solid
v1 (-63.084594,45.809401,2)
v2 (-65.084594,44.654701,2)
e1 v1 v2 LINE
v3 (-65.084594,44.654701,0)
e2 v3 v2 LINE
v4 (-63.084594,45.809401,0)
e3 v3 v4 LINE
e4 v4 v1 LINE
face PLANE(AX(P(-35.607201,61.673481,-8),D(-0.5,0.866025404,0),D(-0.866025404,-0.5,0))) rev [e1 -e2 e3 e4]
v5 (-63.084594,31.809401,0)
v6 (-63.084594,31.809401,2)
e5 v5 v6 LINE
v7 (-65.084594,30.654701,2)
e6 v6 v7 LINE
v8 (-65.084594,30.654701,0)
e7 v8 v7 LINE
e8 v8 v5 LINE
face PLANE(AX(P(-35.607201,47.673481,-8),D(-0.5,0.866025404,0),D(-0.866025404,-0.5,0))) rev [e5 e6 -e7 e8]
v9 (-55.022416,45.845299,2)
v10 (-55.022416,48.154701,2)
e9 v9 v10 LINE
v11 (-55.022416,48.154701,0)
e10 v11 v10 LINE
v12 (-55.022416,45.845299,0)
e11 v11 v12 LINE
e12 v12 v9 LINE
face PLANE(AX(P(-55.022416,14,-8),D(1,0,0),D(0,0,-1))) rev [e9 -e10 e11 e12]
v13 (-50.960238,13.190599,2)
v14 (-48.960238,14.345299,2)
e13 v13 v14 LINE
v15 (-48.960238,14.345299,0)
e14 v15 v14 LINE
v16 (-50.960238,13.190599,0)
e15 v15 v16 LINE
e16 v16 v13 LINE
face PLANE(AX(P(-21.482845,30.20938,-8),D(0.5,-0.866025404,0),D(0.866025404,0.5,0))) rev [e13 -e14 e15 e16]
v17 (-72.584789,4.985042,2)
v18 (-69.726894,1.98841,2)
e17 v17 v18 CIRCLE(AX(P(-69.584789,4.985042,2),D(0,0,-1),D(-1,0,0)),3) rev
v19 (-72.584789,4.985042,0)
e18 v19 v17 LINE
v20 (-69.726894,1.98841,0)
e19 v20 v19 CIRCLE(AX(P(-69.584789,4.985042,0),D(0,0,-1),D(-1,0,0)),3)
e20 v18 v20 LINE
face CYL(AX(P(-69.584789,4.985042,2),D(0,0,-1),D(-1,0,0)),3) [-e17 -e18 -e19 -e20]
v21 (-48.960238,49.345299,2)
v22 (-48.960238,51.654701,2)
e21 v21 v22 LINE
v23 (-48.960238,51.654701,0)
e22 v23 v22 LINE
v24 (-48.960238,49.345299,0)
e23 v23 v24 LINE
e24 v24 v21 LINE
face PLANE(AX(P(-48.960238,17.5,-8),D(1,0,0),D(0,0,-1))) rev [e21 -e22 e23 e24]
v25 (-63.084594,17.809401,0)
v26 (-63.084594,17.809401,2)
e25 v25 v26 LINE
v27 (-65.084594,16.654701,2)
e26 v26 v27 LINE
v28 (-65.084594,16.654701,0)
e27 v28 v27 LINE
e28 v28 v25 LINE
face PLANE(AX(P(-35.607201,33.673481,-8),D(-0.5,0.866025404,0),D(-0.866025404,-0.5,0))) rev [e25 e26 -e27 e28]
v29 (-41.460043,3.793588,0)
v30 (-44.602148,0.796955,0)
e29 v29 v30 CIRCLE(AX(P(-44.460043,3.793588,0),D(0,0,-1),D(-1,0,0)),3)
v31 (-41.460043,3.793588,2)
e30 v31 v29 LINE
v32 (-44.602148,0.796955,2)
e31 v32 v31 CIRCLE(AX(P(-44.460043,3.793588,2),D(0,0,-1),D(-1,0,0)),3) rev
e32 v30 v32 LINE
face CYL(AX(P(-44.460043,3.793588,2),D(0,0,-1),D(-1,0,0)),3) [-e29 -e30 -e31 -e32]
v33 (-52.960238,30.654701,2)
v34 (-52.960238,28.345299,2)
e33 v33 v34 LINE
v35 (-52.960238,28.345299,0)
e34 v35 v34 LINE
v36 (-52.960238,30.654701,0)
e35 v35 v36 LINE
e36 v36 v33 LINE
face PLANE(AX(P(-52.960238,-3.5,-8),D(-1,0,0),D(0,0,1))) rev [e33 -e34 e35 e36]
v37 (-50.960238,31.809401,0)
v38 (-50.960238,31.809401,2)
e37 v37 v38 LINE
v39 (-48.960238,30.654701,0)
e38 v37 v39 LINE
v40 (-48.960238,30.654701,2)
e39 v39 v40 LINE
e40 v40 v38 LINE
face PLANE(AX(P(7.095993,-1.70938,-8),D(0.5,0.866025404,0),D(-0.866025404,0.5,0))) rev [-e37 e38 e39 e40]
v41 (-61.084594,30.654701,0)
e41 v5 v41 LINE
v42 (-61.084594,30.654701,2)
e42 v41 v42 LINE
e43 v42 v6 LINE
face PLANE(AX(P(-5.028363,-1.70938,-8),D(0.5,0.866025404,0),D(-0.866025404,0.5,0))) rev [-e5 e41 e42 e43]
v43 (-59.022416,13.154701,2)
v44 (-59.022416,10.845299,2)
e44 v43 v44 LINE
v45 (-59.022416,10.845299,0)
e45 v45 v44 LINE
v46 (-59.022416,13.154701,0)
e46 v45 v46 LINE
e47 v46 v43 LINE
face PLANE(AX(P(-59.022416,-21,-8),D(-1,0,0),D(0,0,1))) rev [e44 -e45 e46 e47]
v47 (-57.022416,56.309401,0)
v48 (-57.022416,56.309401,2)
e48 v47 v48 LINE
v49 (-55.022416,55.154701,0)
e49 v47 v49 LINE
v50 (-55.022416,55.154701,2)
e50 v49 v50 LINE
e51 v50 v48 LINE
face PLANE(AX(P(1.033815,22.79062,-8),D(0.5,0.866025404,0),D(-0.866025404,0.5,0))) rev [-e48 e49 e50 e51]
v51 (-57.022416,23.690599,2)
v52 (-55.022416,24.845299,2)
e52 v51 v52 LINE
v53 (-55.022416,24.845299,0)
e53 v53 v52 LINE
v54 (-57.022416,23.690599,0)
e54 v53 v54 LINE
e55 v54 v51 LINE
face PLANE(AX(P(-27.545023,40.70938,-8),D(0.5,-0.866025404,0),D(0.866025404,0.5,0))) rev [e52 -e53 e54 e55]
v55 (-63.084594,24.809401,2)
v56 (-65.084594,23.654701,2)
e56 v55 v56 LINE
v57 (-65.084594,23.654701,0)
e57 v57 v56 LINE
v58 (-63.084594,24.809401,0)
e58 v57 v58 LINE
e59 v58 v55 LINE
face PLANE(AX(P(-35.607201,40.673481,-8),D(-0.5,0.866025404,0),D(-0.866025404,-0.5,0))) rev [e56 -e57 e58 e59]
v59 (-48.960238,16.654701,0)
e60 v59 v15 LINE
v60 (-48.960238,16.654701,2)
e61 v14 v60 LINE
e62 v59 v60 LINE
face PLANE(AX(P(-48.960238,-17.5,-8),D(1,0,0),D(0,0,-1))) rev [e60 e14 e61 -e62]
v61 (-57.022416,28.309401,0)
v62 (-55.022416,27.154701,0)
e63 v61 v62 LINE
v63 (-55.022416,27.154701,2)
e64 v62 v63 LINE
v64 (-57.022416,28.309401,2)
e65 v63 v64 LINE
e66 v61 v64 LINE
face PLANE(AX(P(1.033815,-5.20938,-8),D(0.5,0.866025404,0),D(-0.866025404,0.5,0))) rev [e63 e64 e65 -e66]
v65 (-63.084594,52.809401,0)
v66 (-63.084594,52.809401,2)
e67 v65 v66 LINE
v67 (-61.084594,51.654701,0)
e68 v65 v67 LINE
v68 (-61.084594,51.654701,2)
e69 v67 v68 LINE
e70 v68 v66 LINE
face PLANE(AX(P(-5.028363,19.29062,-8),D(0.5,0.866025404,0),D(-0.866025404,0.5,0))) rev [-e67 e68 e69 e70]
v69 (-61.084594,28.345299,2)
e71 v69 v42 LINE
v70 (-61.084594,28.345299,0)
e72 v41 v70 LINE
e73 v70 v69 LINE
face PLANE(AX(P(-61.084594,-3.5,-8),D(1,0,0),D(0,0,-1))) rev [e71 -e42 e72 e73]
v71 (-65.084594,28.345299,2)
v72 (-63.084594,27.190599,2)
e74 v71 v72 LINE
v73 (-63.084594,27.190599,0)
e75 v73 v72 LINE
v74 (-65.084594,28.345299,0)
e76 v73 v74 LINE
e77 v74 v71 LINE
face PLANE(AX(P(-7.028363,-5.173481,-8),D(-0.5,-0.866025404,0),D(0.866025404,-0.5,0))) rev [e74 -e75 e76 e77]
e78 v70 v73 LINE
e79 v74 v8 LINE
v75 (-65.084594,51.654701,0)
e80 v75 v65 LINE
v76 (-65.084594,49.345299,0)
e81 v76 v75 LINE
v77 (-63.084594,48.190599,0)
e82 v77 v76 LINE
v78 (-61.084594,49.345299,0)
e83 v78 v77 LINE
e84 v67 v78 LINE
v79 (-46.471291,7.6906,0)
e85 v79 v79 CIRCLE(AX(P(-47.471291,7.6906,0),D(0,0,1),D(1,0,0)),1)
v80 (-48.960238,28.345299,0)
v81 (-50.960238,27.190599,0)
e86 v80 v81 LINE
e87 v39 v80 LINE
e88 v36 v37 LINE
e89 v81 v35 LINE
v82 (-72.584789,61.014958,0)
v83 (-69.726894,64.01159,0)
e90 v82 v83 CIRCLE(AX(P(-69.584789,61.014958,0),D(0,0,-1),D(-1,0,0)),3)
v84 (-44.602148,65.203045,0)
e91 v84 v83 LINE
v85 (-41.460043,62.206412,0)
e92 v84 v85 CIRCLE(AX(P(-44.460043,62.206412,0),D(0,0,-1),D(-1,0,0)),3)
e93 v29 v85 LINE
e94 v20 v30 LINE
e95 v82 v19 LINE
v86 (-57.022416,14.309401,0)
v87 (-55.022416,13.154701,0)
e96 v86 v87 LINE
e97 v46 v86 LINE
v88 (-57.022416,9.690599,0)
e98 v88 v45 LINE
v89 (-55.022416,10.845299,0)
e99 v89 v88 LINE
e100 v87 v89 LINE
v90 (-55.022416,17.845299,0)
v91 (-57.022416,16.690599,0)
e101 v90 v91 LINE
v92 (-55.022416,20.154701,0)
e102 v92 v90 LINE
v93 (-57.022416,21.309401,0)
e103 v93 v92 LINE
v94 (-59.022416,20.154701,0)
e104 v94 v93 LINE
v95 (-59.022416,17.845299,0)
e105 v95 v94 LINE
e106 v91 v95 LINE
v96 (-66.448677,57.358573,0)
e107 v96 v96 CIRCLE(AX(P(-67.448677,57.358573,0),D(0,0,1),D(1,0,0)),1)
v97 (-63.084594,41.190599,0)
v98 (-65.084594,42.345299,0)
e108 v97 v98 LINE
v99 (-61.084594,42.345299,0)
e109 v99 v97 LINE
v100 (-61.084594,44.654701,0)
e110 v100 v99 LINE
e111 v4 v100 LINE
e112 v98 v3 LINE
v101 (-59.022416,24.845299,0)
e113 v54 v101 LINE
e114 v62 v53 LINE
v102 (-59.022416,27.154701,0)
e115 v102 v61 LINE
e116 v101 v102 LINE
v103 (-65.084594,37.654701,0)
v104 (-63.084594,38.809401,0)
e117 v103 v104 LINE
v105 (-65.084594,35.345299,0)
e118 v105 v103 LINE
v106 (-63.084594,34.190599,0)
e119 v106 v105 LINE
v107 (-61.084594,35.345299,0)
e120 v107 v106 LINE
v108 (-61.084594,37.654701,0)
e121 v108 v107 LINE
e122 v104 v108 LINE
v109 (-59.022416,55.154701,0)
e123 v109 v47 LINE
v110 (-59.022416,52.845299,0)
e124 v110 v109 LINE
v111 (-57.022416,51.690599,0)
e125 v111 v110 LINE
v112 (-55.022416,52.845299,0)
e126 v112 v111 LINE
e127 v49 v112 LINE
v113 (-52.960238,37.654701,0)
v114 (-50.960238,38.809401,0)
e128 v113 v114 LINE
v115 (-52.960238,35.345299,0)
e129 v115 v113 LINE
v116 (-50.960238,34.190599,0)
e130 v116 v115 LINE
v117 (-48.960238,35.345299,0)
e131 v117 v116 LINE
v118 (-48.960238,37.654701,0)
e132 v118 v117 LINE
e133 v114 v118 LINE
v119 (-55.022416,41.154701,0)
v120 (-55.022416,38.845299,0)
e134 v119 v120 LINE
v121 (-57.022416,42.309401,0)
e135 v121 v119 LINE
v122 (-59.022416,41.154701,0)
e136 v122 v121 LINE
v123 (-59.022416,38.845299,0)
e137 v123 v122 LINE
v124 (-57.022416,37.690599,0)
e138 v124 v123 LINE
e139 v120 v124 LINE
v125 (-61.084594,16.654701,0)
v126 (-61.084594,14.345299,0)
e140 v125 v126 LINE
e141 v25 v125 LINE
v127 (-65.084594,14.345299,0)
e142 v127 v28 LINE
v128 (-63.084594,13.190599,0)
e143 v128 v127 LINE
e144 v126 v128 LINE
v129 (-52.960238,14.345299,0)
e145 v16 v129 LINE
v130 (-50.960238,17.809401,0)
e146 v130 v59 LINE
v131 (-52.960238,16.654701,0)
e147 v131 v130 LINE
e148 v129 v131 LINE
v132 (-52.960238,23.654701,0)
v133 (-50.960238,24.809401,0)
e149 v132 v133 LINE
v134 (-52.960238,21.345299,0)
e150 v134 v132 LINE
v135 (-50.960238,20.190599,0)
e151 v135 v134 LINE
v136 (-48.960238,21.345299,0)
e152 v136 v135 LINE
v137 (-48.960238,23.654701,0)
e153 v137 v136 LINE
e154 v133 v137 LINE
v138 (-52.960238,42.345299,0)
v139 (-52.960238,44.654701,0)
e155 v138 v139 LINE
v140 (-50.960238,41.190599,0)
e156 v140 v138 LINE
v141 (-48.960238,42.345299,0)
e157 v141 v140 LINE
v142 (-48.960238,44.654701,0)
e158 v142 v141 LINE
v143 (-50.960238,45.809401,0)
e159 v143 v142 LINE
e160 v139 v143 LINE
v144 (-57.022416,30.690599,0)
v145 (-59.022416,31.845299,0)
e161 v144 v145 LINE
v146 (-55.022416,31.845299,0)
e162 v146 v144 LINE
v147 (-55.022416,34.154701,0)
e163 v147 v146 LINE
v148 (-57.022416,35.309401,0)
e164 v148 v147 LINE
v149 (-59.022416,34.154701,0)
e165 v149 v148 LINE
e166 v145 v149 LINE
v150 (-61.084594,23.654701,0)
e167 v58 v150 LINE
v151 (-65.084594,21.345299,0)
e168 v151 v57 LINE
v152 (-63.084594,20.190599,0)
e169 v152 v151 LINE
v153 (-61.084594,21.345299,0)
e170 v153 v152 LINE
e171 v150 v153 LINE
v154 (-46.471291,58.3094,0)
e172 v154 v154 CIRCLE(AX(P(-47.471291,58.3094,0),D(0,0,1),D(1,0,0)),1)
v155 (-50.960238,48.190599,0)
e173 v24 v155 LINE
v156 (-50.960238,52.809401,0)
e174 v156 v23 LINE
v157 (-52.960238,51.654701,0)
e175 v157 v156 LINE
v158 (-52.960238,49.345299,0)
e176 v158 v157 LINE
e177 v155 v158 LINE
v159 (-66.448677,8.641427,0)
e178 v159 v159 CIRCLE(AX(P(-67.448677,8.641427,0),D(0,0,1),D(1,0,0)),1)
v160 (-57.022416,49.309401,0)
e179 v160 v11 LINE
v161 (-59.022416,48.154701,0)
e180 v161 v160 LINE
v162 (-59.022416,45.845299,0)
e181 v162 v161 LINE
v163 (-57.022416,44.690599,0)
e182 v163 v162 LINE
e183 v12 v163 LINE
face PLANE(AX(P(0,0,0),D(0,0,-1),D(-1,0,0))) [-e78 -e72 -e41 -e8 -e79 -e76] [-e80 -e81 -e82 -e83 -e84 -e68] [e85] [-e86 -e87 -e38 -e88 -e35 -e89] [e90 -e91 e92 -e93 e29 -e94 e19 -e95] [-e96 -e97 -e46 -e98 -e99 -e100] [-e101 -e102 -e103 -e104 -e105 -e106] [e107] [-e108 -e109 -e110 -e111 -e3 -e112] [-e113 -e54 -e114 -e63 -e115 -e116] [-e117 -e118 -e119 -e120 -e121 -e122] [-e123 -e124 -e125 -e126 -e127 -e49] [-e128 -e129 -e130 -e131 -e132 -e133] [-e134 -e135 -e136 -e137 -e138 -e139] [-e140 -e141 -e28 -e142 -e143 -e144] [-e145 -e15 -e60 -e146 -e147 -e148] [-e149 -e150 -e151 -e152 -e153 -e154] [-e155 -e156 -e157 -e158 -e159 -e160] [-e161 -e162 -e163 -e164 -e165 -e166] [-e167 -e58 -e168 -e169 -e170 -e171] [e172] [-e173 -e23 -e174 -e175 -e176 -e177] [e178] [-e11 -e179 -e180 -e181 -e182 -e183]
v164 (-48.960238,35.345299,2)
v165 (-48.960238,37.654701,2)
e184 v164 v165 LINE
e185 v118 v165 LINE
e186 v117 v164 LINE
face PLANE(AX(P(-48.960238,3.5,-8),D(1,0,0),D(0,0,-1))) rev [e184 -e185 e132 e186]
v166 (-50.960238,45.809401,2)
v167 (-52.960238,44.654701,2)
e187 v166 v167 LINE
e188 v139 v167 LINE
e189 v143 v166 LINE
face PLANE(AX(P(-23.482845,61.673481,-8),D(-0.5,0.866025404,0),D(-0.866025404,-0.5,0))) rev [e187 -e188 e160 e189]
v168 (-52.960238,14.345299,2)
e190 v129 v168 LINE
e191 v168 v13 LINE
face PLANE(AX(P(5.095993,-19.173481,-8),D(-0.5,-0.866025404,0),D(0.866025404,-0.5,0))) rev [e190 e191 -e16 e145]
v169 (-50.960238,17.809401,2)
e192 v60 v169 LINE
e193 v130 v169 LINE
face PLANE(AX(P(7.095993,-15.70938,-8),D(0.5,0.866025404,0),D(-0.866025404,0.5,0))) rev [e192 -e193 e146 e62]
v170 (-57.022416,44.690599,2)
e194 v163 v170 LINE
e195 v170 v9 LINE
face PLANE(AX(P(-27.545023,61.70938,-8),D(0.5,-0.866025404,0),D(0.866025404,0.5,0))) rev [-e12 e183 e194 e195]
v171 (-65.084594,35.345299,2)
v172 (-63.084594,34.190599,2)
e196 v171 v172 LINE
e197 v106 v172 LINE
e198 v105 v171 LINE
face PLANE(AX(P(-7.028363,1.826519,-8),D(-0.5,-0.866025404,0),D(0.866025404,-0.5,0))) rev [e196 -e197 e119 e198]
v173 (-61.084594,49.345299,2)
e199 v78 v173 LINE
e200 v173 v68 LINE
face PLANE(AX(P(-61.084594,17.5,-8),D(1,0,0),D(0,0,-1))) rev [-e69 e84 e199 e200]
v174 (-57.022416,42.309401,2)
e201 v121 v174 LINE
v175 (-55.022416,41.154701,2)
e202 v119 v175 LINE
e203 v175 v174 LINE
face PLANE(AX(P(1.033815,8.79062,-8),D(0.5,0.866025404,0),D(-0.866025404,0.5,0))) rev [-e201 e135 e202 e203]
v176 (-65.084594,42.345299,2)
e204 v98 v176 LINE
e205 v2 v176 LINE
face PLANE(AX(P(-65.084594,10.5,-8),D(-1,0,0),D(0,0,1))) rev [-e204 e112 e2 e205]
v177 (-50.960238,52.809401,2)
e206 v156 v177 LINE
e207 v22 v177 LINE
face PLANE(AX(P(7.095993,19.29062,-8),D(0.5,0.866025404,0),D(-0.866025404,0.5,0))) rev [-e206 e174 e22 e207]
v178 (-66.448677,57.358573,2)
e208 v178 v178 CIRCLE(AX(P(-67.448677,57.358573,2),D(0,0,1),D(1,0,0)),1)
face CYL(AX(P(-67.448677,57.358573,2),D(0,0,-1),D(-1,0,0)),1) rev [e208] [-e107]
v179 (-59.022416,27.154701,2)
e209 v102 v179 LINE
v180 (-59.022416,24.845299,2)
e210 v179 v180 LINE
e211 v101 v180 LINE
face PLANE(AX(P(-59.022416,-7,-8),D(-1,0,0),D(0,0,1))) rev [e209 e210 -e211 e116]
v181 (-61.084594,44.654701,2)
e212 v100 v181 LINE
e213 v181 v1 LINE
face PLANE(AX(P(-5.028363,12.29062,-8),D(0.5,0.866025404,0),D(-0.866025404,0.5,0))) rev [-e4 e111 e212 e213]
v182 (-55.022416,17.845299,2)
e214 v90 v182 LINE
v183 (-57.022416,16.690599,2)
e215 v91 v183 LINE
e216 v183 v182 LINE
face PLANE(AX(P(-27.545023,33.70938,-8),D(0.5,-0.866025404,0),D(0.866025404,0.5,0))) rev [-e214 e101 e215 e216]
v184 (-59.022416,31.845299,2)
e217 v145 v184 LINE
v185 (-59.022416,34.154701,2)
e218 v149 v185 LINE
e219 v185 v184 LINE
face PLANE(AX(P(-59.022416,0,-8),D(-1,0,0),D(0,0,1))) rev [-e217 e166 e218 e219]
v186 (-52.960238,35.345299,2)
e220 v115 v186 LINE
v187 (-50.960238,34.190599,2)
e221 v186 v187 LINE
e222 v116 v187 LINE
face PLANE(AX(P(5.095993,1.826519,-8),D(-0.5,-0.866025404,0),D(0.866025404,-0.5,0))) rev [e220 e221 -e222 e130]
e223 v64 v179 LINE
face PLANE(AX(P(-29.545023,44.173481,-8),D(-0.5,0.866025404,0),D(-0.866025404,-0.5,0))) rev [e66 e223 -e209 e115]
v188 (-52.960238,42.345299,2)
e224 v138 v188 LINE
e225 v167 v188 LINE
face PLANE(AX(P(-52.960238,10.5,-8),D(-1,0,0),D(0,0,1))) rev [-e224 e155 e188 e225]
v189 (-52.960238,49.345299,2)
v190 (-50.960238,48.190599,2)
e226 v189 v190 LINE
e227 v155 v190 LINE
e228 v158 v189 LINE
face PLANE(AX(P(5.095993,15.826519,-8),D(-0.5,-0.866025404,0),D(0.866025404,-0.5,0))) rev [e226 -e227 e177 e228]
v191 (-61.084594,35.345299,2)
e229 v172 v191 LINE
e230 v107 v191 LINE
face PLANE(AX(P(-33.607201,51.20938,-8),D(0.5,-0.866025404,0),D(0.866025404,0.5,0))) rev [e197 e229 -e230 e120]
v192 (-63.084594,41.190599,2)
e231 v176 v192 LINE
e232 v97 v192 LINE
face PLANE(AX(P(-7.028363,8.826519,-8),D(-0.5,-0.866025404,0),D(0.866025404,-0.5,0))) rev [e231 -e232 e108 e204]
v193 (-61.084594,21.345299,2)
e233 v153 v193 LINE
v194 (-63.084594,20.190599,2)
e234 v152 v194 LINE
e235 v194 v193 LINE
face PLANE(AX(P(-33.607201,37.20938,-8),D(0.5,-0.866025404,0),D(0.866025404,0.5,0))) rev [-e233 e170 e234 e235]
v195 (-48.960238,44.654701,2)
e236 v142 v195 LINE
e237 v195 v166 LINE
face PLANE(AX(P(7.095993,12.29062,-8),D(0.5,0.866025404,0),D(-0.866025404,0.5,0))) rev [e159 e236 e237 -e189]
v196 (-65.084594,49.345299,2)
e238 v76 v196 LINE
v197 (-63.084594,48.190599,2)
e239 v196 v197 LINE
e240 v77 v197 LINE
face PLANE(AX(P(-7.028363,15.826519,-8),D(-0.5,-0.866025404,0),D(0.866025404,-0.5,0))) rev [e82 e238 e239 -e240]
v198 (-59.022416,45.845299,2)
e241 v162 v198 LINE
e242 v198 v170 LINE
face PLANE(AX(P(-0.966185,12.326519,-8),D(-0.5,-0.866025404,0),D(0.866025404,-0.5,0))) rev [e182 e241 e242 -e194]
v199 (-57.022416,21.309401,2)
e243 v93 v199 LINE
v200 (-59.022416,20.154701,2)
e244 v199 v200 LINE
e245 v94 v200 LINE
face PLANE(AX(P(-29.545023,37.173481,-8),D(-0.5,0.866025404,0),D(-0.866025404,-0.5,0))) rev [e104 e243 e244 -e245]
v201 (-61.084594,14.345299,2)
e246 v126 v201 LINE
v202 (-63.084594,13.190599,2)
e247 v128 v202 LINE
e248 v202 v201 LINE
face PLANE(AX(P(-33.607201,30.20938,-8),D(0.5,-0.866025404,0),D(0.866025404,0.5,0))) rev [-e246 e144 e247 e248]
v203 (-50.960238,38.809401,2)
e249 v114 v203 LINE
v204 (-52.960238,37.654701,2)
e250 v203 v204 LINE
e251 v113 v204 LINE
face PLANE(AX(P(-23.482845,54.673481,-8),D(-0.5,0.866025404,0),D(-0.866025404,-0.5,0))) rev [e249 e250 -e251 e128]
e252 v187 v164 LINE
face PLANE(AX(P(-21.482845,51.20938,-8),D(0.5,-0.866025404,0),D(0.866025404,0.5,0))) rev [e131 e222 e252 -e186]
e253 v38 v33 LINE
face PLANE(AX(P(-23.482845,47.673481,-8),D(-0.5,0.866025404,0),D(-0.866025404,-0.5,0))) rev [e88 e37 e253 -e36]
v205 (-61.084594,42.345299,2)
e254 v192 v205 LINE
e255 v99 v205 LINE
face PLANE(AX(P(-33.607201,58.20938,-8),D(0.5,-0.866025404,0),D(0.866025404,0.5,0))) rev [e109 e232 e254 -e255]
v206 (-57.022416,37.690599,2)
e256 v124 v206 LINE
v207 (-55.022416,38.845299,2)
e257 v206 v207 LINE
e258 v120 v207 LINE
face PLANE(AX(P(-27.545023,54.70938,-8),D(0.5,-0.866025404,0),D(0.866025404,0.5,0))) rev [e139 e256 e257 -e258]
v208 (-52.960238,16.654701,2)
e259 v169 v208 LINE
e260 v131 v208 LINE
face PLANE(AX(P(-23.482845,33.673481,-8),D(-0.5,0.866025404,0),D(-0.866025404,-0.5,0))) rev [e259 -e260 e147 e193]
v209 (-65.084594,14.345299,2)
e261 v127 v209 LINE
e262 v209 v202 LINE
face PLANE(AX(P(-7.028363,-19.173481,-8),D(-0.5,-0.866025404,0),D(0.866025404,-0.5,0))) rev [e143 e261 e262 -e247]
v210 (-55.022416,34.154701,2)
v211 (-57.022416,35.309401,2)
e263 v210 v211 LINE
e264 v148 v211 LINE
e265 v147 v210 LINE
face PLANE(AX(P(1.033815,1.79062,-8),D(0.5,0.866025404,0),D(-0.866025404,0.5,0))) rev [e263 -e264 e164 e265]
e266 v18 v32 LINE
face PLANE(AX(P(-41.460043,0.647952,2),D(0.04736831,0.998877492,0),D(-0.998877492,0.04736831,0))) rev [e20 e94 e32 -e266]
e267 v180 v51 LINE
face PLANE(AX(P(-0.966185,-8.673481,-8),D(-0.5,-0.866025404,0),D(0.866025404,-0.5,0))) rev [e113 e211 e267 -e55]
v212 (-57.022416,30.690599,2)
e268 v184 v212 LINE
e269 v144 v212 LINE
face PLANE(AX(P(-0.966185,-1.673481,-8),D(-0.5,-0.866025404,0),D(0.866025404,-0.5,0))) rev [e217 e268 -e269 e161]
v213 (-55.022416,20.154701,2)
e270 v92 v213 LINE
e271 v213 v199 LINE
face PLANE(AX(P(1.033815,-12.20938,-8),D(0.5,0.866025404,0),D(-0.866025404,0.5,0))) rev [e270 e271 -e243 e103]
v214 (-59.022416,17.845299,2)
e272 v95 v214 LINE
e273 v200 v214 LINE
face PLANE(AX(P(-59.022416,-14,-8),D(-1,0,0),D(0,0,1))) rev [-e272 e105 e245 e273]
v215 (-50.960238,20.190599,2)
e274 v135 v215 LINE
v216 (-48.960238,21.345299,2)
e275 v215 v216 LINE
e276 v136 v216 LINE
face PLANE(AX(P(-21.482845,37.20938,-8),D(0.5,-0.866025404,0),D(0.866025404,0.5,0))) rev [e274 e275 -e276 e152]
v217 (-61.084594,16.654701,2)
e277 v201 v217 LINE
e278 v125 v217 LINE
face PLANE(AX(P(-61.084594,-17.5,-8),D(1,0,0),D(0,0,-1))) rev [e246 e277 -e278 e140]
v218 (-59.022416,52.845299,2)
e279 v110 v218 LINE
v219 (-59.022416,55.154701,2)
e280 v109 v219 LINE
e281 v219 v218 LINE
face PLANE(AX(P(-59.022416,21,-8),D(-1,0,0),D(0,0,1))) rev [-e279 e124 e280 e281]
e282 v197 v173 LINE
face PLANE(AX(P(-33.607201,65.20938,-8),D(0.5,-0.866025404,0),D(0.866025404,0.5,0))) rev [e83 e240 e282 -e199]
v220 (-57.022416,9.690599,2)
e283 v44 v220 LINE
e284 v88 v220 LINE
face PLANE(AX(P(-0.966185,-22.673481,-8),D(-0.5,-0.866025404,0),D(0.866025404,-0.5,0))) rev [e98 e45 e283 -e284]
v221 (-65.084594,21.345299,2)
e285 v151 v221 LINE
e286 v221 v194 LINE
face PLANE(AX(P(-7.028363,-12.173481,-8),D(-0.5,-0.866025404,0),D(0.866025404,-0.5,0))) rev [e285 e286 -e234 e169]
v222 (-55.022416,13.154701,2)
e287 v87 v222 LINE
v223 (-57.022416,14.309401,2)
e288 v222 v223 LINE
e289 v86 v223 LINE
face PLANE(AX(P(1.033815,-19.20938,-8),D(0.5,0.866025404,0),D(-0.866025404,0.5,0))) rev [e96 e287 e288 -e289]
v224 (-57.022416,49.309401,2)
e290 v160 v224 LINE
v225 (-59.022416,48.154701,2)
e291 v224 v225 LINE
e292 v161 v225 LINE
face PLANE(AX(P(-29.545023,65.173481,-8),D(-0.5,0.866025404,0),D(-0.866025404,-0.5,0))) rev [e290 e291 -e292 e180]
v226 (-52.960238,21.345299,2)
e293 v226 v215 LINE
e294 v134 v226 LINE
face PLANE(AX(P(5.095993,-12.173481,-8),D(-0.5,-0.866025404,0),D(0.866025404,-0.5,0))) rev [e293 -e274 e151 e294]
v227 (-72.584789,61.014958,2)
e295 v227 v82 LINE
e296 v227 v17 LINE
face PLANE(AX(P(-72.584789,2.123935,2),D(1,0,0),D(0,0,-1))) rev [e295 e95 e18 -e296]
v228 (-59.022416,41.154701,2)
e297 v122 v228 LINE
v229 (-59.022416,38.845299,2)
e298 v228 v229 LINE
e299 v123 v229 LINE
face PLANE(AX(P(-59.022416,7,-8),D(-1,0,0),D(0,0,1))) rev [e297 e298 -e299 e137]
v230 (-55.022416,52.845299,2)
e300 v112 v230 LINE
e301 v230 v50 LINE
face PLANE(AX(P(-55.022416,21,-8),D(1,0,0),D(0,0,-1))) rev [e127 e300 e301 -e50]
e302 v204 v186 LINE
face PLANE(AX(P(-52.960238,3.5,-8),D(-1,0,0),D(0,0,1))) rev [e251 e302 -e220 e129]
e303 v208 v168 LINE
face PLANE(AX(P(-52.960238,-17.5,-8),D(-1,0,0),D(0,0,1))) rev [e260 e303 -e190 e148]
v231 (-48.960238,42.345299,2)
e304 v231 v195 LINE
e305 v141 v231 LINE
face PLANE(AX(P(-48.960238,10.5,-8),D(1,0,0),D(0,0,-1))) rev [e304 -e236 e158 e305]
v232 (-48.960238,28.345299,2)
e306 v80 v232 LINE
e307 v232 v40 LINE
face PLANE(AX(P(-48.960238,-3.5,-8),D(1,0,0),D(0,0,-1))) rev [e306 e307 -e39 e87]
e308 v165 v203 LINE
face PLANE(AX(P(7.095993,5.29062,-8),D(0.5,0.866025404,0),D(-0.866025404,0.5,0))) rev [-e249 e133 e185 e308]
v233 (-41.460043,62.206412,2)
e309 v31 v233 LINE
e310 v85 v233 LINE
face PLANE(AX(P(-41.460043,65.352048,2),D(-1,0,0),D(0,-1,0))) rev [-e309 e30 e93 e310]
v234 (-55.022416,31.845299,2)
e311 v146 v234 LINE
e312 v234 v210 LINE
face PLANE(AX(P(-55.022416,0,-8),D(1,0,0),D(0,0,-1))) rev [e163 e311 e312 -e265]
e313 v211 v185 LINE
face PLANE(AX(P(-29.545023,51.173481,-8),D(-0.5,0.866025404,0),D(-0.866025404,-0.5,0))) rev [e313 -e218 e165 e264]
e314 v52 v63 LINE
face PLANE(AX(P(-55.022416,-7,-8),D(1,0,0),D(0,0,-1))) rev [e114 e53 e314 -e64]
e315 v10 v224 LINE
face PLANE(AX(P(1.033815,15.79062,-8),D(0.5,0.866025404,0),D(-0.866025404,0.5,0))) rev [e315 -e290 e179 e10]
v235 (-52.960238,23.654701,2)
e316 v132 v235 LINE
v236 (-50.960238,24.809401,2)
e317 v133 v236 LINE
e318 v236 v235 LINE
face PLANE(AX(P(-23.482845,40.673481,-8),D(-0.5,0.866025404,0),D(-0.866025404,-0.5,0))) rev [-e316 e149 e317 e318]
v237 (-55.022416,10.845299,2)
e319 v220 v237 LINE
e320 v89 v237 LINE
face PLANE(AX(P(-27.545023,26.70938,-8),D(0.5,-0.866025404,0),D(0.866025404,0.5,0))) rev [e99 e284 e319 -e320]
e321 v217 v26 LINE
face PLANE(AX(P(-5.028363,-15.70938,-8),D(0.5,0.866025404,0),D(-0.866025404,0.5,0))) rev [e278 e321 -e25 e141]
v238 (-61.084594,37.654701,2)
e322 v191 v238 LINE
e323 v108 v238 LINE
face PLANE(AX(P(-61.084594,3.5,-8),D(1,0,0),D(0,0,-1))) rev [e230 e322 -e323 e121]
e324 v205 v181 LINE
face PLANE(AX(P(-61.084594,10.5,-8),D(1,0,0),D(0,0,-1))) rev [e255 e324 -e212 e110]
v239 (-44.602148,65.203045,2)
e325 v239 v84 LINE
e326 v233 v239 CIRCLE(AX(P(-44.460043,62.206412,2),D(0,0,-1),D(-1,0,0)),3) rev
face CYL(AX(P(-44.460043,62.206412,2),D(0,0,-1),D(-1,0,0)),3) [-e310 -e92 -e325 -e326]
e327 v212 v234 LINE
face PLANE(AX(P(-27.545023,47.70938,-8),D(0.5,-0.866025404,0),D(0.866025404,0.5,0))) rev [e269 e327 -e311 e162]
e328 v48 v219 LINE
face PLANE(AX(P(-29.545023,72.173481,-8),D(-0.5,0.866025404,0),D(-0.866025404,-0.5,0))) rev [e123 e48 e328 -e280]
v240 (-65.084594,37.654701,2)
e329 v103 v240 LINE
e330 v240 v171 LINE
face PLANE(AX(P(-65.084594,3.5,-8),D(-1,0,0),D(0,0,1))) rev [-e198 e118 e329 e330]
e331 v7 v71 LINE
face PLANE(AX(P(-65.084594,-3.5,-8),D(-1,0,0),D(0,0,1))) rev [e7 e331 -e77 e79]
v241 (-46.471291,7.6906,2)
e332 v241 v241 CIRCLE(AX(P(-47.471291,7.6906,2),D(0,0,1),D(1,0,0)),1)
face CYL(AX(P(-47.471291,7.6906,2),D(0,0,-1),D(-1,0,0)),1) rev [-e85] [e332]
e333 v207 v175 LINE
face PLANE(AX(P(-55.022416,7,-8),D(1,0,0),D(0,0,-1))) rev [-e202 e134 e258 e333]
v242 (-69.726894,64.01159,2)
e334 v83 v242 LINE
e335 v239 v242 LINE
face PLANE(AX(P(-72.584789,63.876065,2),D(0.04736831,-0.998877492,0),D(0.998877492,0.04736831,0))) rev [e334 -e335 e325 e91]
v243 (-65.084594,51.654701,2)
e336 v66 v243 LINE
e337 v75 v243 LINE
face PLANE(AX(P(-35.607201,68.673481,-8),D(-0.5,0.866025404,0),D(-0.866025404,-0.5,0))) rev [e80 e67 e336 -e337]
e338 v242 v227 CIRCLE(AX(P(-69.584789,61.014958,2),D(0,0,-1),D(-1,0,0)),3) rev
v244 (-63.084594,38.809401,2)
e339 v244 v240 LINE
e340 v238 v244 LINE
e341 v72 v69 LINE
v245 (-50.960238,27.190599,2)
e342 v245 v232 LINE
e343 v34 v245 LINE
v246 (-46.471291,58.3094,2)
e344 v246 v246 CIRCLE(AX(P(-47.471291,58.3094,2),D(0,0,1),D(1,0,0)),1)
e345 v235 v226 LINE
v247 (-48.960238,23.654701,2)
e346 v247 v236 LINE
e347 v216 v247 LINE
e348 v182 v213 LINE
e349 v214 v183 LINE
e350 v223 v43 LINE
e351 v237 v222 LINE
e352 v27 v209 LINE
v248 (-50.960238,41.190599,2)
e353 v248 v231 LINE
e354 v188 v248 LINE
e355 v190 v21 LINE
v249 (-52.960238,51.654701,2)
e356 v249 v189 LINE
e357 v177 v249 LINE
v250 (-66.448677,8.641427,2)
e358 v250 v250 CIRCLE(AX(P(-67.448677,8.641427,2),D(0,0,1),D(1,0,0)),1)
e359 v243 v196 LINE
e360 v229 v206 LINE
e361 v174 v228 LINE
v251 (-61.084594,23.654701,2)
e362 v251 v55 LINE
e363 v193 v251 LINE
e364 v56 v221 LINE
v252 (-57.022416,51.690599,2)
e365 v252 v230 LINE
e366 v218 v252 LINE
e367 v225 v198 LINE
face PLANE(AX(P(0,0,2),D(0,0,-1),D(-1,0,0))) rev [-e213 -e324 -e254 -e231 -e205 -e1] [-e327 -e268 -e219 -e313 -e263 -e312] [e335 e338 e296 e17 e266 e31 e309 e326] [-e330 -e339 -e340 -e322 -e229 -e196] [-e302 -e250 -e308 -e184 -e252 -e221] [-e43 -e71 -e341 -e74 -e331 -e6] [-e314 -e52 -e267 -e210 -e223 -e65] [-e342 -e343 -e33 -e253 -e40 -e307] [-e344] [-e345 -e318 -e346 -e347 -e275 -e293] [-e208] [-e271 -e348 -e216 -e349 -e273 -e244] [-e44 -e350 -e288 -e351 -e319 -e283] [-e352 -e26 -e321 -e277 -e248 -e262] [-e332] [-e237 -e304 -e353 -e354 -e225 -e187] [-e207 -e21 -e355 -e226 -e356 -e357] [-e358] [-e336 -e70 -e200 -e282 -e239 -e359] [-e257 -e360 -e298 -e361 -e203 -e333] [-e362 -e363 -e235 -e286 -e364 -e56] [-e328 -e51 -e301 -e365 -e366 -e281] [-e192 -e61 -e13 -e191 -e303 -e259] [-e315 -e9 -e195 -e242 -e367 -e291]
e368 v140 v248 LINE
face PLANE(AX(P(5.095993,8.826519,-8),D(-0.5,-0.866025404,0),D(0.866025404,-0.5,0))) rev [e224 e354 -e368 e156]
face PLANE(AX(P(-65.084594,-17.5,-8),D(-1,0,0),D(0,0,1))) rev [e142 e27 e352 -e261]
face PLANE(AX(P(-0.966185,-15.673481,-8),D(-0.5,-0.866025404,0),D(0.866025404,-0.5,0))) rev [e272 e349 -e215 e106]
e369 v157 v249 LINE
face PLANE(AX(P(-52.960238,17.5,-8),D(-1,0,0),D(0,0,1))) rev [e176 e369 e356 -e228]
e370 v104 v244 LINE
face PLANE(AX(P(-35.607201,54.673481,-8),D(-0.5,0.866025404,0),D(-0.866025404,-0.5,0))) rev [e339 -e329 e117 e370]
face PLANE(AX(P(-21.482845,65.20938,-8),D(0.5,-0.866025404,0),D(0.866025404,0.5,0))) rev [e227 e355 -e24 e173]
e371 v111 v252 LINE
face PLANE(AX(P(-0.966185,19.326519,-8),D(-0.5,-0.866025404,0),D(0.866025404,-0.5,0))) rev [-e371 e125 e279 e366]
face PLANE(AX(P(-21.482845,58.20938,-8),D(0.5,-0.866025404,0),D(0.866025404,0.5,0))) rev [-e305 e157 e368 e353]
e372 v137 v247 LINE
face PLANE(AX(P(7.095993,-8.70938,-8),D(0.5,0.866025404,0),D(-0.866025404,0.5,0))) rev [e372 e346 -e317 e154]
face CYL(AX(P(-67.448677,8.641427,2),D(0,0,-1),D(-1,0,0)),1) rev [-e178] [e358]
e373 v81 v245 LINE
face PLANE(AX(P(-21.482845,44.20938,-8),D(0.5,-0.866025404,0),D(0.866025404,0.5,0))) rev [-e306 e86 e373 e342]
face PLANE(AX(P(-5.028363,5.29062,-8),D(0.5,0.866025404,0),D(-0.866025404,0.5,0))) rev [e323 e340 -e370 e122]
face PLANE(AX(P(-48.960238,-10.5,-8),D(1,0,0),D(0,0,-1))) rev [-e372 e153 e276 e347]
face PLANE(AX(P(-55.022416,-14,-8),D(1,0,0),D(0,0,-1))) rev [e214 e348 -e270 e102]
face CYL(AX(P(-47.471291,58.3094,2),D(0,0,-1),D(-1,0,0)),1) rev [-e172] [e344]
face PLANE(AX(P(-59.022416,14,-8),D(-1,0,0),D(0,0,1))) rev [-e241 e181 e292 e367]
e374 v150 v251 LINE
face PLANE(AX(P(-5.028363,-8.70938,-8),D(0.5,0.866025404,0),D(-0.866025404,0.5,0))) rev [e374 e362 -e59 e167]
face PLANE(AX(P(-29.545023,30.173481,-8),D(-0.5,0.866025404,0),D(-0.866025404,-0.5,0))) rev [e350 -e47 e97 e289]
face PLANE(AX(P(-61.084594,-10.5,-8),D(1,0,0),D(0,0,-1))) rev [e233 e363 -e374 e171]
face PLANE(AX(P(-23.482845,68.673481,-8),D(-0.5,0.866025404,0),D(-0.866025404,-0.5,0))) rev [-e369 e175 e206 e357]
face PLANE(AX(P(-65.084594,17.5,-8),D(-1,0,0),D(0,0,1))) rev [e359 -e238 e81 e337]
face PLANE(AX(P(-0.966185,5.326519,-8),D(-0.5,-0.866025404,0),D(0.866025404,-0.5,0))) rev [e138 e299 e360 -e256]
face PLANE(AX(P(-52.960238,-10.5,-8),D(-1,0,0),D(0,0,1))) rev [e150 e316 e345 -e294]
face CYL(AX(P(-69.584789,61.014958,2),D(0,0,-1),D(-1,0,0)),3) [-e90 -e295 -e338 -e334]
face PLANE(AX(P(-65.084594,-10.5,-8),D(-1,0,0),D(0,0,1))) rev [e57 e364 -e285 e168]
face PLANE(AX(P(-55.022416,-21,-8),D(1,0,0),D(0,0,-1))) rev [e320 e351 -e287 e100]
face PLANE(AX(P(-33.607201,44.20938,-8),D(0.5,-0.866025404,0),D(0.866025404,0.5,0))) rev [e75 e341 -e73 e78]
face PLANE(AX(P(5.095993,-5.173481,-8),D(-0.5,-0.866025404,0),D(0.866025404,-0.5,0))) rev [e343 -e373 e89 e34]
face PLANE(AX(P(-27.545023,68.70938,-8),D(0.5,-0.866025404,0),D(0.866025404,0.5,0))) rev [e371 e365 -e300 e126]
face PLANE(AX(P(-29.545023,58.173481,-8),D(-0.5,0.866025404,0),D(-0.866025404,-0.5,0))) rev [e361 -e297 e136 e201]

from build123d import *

# Parameters (mm, degrees)
SKETCH_1_R          = 1
EXTRUDE_1_DEPTH     = 2
FILLET_1_R          = 3
CUT_EXTRUDE_1_DEPTH = 10
OTHER_1_DEPTH       = 2


# Read off the part's stored shape, not the designer's step: 填充阵列1
with BuildPart() as part:
    # 草图1 → 凸台-拉伸1 (new body)
    with BuildSketch(Plane.XY):
        Polygon((-41.460043107, 0.647951852), (-72.584789341, 2.123935292), (-72.584789341, 63.876064708), (-41.460043107, 65.352048148), align=None)
        with Locations((-67.448676919, 57.358573192)):
            Circle(SKETCH_1_R, mode=Mode.SUBTRACT)
        with Locations((-47.471291497, 58.309400037)):
            Circle(SKETCH_1_R, mode=Mode.SUBTRACT)
        with Locations((-67.448676919, 8.641426808)):
            Circle(SKETCH_1_R, mode=Mode.SUBTRACT)
        with Locations((-47.471291497, 7.690599963)):
            Circle(SKETCH_1_R, mode=Mode.SUBTRACT)
    extrude(amount=EXTRUDE_1_DEPTH)

    # 圆角1
    fillet_1_edges = [part.edges().sort_by_distance(p)[0] for p in [
        (-41.460043107, 0.647951852, 1),
        (-72.584789341, 2.123935292, 1),
        (-72.584789341, 63.876064708, 1),
        (-41.460043107, 65.352048148, 1),
    ]]
    fillet(fillet_1_edges, radius=FILLET_1_R)

    # 草图4 → 切除-拉伸1 (cut)
    with BuildSketch(Plane.XY.offset(2)):
        Polygon((-59.022416224, 33), (-55.022416224, 33), (-55.022416224, 34.154700538), (-57.022416224, 35.309401077), (-59.022416224, 34.154700538), align=None)
        Polygon((-55.022416224, 31.845299462), (-55.022416224, 33), (-59.022416224, 33), (-59.022416224, 31.845299462), (-57.022416224, 30.690598923), align=None)
    extrude(amount=-CUT_EXTRUDE_1_DEPTH, mode=Mode.SUBTRACT)

    # 填充阵列1 outline → 填充阵列1 (cut)
    with BuildSketch(Plane.XY):
        Polygon((-61.084594051, 30.654700538), (-63.084594051, 31.809401077), (-65.084594051, 30.654700538), (-65.084594051, 28.345299462), (-63.084594051, 27.190598923), (-61.084594051, 28.345299462), align=None)
        Polygon((-48.960238398, 37.654700538), (-50.960238398, 38.809401077), (-52.960238398, 37.654700538), (-52.960238398, 35.345299462), (-50.960238398, 34.190598923), (-48.960238398, 35.345299462), align=None)
        Polygon((-48.960238398, 28.345299462), (-48.960238398, 30.654700538), (-50.960238398, 31.809401077), (-52.960238398, 30.654700538), (-52.960238398, 28.345299462), (-50.960238398, 27.190598923), align=None)
        Polygon((-61.084594051, 35.345299462), (-61.084594051, 37.654700538), (-63.084594051, 38.809401077), (-65.084594051, 37.654700538), (-65.084594051, 35.345299462), (-63.084594051, 34.190598923), align=None)
        Polygon((-57.022416224, 51.690598923), (-55.022416224, 52.845299462), (-55.022416224, 55.154700538), (-57.022416224, 56.309401077), (-59.022416224, 55.154700538), (-59.022416224, 52.845299462), align=None)
        Polygon((-57.022416224, 9.690598923), (-55.022416224, 10.845299462), (-55.022416224, 13.154700538), (-57.022416224, 14.309401077), (-59.022416224, 13.154700538), (-59.022416224, 10.845299462), align=None)
        Polygon((-57.022416224, 23.690598923), (-55.022416224, 24.845299462), (-55.022416224, 27.154700538), (-57.022416224, 28.309401077), (-59.022416224, 27.154700538), (-59.022416224, 24.845299462), align=None)
        Polygon((-57.022416224, 16.690598923), (-55.022416224, 17.845299462), (-55.022416224, 20.154700538), (-57.022416224, 21.309401077), (-59.022416224, 20.154700538), (-59.022416224, 17.845299462), align=None)
        Polygon((-57.022416224, 44.690598923), (-55.022416224, 45.845299462), (-55.022416224, 48.154700538), (-57.022416224, 49.309401077), (-59.022416224, 48.154700538), (-59.022416224, 45.845299462), align=None)
        Polygon((-57.022416224, 37.690598923), (-55.022416224, 38.845299462), (-55.022416224, 41.154700538), (-57.022416224, 42.309401077), (-59.022416224, 41.154700538), (-59.022416224, 38.845299462), align=None)
        Polygon((-61.084594051, 51.654700538), (-63.084594051, 52.809401077), (-65.084594051, 51.654700538), (-65.084594051, 49.345299462), (-63.084594051, 48.190598923), (-61.084594051, 49.345299462), align=None)
        Polygon((-48.960238398, 49.345299462), (-48.960238398, 51.654700538), (-50.960238398, 52.809401077), (-52.960238398, 51.654700538), (-52.960238398, 49.345299462), (-50.960238398, 48.190598923), align=None)
        Polygon((-48.960238398, 16.654700538), (-50.960238398, 17.809401077), (-52.960238398, 16.654700538), (-52.960238398, 14.345299462), (-50.960238398, 13.190598923), (-48.960238398, 14.345299462), align=None)
        Polygon((-61.084594051, 14.345299462), (-61.084594051, 16.654700538), (-63.084594051, 17.809401077), (-65.084594051, 16.654700538), (-65.084594051, 14.345299462), (-63.084594051, 13.190598923), align=None)
        Polygon((-48.960238398, 23.654700538), (-50.960238398, 24.809401077), (-52.960238398, 23.654700538), (-52.960238398, 21.345299462), (-50.960238398, 20.190598923), (-48.960238398, 21.345299462), align=None)
        Polygon((-50.960238398, 41.190598923), (-48.960238398, 42.345299462), (-48.960238398, 44.654700538), (-50.960238398, 45.809401077), (-52.960238398, 44.654700538), (-52.960238398, 42.345299462), align=None)
        Polygon((-61.084594051, 23.654700538), (-63.084594051, 24.809401077), (-65.084594051, 23.654700538), (-65.084594051, 21.345299462), (-63.084594051, 20.190598923), (-61.084594051, 21.345299462), align=None)
        Polygon((-63.084594051, 41.190598923), (-61.084594051, 42.345299462), (-61.084594051, 44.654700538), (-63.084594051, 45.809401077), (-65.084594051, 44.654700538), (-65.084594051, 42.345299462), align=None)
    extrude(amount=OTHER_1_DEPTH, mode=Mode.SUBTRACT)


solid = part.part
